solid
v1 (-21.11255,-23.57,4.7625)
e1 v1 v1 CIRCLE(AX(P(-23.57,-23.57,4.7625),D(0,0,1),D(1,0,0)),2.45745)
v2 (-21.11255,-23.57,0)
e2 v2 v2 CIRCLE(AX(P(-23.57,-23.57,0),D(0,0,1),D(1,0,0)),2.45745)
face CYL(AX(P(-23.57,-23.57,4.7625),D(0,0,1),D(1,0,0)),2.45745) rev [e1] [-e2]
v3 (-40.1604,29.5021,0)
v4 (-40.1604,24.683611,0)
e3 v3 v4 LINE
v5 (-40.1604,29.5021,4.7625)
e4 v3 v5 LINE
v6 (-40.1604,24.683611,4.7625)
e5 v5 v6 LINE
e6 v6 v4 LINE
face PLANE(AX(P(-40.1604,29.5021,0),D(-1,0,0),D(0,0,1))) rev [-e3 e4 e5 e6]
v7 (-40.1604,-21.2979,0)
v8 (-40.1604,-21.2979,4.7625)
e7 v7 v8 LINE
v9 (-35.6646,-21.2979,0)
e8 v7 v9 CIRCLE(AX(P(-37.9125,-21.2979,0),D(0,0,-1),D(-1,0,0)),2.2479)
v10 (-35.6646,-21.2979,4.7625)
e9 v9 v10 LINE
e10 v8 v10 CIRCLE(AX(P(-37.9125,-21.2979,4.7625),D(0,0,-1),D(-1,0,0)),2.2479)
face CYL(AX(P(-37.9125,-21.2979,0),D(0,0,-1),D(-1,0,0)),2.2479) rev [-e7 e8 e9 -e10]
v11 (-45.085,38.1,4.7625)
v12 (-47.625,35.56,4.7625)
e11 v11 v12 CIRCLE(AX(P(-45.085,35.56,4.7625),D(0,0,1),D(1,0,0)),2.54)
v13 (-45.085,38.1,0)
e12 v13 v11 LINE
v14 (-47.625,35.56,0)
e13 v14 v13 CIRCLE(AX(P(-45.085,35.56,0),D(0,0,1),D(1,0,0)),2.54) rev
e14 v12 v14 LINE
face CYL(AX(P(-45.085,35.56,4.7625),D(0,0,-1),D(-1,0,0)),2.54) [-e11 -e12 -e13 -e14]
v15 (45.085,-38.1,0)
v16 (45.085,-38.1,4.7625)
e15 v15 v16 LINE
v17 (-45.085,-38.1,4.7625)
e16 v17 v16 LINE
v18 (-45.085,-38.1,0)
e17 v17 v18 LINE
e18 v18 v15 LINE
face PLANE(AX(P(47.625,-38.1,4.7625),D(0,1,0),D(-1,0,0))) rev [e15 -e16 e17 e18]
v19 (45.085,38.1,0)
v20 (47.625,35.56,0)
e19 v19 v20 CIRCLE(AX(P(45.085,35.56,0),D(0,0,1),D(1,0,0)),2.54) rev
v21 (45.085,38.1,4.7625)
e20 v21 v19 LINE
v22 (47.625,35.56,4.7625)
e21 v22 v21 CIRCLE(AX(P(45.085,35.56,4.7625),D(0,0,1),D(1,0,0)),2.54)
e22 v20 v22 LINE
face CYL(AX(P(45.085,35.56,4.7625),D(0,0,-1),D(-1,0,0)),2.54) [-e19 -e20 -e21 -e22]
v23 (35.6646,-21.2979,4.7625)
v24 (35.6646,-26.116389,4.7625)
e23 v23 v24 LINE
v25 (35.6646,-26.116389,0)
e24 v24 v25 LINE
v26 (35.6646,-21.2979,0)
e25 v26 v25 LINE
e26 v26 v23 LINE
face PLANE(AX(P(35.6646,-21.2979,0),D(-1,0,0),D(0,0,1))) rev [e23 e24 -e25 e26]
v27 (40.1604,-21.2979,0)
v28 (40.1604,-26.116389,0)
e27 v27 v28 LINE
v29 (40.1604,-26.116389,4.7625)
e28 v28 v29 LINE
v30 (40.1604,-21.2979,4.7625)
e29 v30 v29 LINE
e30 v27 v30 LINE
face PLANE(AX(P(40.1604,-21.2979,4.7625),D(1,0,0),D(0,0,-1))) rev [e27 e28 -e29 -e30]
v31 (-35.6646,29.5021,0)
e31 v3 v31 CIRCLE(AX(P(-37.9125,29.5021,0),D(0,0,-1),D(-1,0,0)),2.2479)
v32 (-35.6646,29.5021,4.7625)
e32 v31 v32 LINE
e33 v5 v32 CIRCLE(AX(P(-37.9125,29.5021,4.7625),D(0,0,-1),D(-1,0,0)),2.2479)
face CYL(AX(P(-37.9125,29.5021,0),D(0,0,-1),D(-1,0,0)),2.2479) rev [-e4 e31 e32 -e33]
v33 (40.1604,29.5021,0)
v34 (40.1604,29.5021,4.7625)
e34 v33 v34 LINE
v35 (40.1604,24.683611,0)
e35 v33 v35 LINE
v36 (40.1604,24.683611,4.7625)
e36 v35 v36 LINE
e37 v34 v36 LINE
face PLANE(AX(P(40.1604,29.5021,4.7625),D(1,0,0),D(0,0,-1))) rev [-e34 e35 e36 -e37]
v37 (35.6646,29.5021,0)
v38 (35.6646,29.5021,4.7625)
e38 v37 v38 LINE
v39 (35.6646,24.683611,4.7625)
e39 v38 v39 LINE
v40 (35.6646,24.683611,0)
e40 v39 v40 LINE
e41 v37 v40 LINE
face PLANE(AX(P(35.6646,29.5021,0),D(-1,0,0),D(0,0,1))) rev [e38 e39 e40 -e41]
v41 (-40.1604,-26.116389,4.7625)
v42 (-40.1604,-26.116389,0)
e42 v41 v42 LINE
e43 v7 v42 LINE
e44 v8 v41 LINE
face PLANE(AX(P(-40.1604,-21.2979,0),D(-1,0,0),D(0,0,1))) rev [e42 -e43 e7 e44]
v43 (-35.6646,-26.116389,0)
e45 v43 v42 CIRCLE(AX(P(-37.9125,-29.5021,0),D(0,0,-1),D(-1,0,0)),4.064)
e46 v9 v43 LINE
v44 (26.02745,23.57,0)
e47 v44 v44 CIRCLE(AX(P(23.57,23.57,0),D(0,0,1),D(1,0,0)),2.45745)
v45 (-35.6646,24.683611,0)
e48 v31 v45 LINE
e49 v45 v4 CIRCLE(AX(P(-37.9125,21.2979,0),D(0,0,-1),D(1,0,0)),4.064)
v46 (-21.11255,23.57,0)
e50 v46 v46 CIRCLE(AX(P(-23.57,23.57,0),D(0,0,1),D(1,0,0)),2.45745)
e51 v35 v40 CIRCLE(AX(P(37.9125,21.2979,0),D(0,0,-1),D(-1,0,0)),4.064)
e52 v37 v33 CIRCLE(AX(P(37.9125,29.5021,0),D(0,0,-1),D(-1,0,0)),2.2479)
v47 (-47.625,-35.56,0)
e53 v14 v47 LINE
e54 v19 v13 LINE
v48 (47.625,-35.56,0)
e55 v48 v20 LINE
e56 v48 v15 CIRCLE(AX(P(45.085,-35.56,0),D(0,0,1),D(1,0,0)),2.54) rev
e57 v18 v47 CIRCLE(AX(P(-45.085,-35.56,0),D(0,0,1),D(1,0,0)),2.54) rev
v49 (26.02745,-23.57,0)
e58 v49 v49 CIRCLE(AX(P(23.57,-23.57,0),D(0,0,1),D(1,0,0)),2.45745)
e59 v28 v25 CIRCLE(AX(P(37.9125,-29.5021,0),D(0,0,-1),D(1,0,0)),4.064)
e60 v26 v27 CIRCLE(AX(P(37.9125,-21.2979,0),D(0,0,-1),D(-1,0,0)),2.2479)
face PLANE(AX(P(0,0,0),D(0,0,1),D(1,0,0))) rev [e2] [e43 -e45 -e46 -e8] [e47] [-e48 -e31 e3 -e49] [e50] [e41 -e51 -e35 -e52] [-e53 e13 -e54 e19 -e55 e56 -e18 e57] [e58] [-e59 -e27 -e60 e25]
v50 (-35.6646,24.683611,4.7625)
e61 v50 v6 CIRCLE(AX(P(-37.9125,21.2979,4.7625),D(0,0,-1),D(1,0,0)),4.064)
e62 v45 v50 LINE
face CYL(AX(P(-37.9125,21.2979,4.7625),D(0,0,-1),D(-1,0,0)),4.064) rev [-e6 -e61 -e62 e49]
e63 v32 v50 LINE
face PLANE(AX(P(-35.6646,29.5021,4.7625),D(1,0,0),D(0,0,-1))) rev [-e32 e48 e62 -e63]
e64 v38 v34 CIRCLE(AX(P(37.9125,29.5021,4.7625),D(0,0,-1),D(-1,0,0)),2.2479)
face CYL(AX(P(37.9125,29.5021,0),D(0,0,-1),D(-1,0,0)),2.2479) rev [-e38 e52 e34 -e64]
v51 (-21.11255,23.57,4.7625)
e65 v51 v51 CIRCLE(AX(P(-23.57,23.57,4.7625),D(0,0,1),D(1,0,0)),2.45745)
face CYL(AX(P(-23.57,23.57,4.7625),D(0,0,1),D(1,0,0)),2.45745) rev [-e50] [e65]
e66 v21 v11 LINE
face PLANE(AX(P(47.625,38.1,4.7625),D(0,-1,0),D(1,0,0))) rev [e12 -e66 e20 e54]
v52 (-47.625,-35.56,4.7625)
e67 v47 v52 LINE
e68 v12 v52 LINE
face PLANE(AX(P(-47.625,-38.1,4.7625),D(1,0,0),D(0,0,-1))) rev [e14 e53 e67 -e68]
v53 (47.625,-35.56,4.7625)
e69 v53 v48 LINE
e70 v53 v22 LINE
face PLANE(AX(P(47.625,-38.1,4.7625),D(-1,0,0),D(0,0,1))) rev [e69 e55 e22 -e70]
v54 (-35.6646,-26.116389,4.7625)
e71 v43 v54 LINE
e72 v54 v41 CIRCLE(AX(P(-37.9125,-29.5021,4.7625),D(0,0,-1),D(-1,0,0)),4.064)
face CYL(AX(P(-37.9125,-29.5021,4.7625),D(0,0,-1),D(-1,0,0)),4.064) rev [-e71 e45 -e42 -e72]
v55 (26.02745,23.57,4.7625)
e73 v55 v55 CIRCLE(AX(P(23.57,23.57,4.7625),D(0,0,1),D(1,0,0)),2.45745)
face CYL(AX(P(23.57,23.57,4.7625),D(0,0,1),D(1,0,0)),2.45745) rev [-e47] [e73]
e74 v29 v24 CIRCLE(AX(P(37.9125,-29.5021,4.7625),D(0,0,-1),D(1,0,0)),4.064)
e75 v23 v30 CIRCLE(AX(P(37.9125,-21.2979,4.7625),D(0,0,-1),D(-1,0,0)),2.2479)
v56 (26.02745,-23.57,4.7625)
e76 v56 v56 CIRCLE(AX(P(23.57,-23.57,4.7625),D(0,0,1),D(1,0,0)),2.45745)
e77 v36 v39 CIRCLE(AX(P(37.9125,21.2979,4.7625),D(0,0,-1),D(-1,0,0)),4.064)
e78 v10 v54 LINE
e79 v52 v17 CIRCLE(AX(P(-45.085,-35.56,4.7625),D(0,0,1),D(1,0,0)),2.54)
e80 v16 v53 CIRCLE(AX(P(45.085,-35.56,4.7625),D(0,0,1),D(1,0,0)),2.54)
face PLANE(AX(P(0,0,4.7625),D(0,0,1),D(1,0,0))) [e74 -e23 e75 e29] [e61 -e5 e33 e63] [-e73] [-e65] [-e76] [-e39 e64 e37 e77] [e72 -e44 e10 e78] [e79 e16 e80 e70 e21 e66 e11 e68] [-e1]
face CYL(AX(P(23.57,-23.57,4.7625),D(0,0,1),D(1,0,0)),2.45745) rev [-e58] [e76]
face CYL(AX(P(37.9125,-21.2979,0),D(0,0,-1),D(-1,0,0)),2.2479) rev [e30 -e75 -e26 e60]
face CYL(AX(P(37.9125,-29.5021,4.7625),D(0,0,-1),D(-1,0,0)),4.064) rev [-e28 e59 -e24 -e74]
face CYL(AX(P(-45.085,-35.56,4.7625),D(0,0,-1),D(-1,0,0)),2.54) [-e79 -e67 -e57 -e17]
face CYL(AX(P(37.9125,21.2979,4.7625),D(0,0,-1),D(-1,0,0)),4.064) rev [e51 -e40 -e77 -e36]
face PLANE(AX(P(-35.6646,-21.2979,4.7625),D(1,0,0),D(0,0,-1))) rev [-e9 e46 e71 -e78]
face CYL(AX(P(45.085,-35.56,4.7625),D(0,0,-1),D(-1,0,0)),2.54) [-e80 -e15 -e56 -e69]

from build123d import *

# Parameters (mm, degrees)
SKETCH1_W                 = 95.25
SKETCH1_H                 = 76.2
BOSS_EXTRUDE1_DEPTH       = 4.7625
F_8_CLEARANCE_HOLE1_D     = 4.9149
FILLET1_R                 = 2.54
F_8_CLEARANCE_SLOT1_DEPTH = 4.7625
SKETCH6_R                 = 4.064
CUT_EXTRUDE1_DEPTH        = 62.175420156


# Read off the part's stored shape, not the designer's step: #8 Clearance Slot1
with BuildPart() as part:
    # Sketch1 → Boss-Extrude1 (new body)
    with BuildSketch(Plane.XY):
        Rectangle(SKETCH1_W, SKETCH1_H)
    extrude(amount=BOSS_EXTRUDE1_DEPTH)

    # #8 Clearance Hole1 (through all)
    with Locations(Plane.XY.offset(4.7625)):
        with Locations((23.57, 23.57), (-23.57, 23.57), (-23.57, -23.57), (23.57, -23.57)):
            Hole(F_8_CLEARANCE_HOLE1_D / 2)

    # Fillet1
    fillet1_edges = [part.edges().sort_by_distance(p)[0] for p in [
        (-47.625, 38.1, 2.38125),
        (47.625, 38.1, 2.38125),
        (47.625, -38.1, 2.38125),
        (-47.625, -38.1, 2.38125),
    ]]
    fillet(fillet1_edges, radius=FILLET1_R)

    # #8 Clearance Slot1 outline → #8 Clearance Slot1 (cut)
    with BuildSketch(Plane.XY):
        with BuildLine():
            ThreePointArc((-40.1604, 21.2979), (-37.9125, 19.05), (-35.6646, 21.2979))
            Line((-35.6646, 21.2979), (-35.6646, 29.5021))
            ThreePointArc((-35.6646, 29.5021), (-37.9125, 31.75), (-40.1604, 29.5021))
            Line((-40.1604, 29.5021), (-40.1604, 21.2979))
        make_face()
        with BuildLine():
            ThreePointArc((-35.6646, -21.2979), (-37.9125, -19.05), (-40.1604, -21.2979))
            Line((-40.1604, -21.2979), (-40.1604, -29.5021))
            ThreePointArc((-40.1604, -29.5021), (-37.9125, -31.75), (-35.6646, -29.5021))
            Line((-35.6646, -29.5021), (-35.6646, -21.2979))
        make_face()
        with BuildLine():
            ThreePointArc((35.6646, -29.5021), (37.9125, -31.75), (40.1604, -29.5021))
            Line((40.1604, -29.5021), (40.1604, -21.2979))
            ThreePointArc((40.1604, -21.2979), (37.9125, -19.05), (35.6646, -21.2979))
            Line((35.6646, -21.2979), (35.6646, -29.5021))
        make_face()
        with BuildLine():
            ThreePointArc((40.1604, 29.5021), (37.9125, 31.75), (35.6646, 29.5021))
            Line((35.6646, 29.5021), (35.6646, 21.2979))
            ThreePointArc((35.6646, 21.2979), (37.9125, 19.05), (40.1604, 21.2979))
            Line((40.1604, 21.2979), (40.1604, 29.5021))
        make_face()
    extrude(amount=F_8_CLEARANCE_SLOT1_DEPTH, mode=Mode.SUBTRACT)

    # Sketch6 → Cut-Extrude1 (cut, through all)
    with BuildSketch(Plane(origin=(0, 0, 0), x_dir=(-1, 0, 0), z_dir=(0, 0, -1))):
        with Locations((-37.9125, 21.2979)):
            Circle(SKETCH6_R)
        with Locations((-37.9125, -29.5021)):
            Circle(SKETCH6_R)
        with Locations((37.9125, -29.5021)):
            Circle(SKETCH6_R)
        with Locations((37.9125, 21.2979)):
            Circle(SKETCH6_R)
    extrude(amount=-CUT_EXTRUDE1_DEPTH, mode=Mode.SUBTRACT)


solid = part.part
